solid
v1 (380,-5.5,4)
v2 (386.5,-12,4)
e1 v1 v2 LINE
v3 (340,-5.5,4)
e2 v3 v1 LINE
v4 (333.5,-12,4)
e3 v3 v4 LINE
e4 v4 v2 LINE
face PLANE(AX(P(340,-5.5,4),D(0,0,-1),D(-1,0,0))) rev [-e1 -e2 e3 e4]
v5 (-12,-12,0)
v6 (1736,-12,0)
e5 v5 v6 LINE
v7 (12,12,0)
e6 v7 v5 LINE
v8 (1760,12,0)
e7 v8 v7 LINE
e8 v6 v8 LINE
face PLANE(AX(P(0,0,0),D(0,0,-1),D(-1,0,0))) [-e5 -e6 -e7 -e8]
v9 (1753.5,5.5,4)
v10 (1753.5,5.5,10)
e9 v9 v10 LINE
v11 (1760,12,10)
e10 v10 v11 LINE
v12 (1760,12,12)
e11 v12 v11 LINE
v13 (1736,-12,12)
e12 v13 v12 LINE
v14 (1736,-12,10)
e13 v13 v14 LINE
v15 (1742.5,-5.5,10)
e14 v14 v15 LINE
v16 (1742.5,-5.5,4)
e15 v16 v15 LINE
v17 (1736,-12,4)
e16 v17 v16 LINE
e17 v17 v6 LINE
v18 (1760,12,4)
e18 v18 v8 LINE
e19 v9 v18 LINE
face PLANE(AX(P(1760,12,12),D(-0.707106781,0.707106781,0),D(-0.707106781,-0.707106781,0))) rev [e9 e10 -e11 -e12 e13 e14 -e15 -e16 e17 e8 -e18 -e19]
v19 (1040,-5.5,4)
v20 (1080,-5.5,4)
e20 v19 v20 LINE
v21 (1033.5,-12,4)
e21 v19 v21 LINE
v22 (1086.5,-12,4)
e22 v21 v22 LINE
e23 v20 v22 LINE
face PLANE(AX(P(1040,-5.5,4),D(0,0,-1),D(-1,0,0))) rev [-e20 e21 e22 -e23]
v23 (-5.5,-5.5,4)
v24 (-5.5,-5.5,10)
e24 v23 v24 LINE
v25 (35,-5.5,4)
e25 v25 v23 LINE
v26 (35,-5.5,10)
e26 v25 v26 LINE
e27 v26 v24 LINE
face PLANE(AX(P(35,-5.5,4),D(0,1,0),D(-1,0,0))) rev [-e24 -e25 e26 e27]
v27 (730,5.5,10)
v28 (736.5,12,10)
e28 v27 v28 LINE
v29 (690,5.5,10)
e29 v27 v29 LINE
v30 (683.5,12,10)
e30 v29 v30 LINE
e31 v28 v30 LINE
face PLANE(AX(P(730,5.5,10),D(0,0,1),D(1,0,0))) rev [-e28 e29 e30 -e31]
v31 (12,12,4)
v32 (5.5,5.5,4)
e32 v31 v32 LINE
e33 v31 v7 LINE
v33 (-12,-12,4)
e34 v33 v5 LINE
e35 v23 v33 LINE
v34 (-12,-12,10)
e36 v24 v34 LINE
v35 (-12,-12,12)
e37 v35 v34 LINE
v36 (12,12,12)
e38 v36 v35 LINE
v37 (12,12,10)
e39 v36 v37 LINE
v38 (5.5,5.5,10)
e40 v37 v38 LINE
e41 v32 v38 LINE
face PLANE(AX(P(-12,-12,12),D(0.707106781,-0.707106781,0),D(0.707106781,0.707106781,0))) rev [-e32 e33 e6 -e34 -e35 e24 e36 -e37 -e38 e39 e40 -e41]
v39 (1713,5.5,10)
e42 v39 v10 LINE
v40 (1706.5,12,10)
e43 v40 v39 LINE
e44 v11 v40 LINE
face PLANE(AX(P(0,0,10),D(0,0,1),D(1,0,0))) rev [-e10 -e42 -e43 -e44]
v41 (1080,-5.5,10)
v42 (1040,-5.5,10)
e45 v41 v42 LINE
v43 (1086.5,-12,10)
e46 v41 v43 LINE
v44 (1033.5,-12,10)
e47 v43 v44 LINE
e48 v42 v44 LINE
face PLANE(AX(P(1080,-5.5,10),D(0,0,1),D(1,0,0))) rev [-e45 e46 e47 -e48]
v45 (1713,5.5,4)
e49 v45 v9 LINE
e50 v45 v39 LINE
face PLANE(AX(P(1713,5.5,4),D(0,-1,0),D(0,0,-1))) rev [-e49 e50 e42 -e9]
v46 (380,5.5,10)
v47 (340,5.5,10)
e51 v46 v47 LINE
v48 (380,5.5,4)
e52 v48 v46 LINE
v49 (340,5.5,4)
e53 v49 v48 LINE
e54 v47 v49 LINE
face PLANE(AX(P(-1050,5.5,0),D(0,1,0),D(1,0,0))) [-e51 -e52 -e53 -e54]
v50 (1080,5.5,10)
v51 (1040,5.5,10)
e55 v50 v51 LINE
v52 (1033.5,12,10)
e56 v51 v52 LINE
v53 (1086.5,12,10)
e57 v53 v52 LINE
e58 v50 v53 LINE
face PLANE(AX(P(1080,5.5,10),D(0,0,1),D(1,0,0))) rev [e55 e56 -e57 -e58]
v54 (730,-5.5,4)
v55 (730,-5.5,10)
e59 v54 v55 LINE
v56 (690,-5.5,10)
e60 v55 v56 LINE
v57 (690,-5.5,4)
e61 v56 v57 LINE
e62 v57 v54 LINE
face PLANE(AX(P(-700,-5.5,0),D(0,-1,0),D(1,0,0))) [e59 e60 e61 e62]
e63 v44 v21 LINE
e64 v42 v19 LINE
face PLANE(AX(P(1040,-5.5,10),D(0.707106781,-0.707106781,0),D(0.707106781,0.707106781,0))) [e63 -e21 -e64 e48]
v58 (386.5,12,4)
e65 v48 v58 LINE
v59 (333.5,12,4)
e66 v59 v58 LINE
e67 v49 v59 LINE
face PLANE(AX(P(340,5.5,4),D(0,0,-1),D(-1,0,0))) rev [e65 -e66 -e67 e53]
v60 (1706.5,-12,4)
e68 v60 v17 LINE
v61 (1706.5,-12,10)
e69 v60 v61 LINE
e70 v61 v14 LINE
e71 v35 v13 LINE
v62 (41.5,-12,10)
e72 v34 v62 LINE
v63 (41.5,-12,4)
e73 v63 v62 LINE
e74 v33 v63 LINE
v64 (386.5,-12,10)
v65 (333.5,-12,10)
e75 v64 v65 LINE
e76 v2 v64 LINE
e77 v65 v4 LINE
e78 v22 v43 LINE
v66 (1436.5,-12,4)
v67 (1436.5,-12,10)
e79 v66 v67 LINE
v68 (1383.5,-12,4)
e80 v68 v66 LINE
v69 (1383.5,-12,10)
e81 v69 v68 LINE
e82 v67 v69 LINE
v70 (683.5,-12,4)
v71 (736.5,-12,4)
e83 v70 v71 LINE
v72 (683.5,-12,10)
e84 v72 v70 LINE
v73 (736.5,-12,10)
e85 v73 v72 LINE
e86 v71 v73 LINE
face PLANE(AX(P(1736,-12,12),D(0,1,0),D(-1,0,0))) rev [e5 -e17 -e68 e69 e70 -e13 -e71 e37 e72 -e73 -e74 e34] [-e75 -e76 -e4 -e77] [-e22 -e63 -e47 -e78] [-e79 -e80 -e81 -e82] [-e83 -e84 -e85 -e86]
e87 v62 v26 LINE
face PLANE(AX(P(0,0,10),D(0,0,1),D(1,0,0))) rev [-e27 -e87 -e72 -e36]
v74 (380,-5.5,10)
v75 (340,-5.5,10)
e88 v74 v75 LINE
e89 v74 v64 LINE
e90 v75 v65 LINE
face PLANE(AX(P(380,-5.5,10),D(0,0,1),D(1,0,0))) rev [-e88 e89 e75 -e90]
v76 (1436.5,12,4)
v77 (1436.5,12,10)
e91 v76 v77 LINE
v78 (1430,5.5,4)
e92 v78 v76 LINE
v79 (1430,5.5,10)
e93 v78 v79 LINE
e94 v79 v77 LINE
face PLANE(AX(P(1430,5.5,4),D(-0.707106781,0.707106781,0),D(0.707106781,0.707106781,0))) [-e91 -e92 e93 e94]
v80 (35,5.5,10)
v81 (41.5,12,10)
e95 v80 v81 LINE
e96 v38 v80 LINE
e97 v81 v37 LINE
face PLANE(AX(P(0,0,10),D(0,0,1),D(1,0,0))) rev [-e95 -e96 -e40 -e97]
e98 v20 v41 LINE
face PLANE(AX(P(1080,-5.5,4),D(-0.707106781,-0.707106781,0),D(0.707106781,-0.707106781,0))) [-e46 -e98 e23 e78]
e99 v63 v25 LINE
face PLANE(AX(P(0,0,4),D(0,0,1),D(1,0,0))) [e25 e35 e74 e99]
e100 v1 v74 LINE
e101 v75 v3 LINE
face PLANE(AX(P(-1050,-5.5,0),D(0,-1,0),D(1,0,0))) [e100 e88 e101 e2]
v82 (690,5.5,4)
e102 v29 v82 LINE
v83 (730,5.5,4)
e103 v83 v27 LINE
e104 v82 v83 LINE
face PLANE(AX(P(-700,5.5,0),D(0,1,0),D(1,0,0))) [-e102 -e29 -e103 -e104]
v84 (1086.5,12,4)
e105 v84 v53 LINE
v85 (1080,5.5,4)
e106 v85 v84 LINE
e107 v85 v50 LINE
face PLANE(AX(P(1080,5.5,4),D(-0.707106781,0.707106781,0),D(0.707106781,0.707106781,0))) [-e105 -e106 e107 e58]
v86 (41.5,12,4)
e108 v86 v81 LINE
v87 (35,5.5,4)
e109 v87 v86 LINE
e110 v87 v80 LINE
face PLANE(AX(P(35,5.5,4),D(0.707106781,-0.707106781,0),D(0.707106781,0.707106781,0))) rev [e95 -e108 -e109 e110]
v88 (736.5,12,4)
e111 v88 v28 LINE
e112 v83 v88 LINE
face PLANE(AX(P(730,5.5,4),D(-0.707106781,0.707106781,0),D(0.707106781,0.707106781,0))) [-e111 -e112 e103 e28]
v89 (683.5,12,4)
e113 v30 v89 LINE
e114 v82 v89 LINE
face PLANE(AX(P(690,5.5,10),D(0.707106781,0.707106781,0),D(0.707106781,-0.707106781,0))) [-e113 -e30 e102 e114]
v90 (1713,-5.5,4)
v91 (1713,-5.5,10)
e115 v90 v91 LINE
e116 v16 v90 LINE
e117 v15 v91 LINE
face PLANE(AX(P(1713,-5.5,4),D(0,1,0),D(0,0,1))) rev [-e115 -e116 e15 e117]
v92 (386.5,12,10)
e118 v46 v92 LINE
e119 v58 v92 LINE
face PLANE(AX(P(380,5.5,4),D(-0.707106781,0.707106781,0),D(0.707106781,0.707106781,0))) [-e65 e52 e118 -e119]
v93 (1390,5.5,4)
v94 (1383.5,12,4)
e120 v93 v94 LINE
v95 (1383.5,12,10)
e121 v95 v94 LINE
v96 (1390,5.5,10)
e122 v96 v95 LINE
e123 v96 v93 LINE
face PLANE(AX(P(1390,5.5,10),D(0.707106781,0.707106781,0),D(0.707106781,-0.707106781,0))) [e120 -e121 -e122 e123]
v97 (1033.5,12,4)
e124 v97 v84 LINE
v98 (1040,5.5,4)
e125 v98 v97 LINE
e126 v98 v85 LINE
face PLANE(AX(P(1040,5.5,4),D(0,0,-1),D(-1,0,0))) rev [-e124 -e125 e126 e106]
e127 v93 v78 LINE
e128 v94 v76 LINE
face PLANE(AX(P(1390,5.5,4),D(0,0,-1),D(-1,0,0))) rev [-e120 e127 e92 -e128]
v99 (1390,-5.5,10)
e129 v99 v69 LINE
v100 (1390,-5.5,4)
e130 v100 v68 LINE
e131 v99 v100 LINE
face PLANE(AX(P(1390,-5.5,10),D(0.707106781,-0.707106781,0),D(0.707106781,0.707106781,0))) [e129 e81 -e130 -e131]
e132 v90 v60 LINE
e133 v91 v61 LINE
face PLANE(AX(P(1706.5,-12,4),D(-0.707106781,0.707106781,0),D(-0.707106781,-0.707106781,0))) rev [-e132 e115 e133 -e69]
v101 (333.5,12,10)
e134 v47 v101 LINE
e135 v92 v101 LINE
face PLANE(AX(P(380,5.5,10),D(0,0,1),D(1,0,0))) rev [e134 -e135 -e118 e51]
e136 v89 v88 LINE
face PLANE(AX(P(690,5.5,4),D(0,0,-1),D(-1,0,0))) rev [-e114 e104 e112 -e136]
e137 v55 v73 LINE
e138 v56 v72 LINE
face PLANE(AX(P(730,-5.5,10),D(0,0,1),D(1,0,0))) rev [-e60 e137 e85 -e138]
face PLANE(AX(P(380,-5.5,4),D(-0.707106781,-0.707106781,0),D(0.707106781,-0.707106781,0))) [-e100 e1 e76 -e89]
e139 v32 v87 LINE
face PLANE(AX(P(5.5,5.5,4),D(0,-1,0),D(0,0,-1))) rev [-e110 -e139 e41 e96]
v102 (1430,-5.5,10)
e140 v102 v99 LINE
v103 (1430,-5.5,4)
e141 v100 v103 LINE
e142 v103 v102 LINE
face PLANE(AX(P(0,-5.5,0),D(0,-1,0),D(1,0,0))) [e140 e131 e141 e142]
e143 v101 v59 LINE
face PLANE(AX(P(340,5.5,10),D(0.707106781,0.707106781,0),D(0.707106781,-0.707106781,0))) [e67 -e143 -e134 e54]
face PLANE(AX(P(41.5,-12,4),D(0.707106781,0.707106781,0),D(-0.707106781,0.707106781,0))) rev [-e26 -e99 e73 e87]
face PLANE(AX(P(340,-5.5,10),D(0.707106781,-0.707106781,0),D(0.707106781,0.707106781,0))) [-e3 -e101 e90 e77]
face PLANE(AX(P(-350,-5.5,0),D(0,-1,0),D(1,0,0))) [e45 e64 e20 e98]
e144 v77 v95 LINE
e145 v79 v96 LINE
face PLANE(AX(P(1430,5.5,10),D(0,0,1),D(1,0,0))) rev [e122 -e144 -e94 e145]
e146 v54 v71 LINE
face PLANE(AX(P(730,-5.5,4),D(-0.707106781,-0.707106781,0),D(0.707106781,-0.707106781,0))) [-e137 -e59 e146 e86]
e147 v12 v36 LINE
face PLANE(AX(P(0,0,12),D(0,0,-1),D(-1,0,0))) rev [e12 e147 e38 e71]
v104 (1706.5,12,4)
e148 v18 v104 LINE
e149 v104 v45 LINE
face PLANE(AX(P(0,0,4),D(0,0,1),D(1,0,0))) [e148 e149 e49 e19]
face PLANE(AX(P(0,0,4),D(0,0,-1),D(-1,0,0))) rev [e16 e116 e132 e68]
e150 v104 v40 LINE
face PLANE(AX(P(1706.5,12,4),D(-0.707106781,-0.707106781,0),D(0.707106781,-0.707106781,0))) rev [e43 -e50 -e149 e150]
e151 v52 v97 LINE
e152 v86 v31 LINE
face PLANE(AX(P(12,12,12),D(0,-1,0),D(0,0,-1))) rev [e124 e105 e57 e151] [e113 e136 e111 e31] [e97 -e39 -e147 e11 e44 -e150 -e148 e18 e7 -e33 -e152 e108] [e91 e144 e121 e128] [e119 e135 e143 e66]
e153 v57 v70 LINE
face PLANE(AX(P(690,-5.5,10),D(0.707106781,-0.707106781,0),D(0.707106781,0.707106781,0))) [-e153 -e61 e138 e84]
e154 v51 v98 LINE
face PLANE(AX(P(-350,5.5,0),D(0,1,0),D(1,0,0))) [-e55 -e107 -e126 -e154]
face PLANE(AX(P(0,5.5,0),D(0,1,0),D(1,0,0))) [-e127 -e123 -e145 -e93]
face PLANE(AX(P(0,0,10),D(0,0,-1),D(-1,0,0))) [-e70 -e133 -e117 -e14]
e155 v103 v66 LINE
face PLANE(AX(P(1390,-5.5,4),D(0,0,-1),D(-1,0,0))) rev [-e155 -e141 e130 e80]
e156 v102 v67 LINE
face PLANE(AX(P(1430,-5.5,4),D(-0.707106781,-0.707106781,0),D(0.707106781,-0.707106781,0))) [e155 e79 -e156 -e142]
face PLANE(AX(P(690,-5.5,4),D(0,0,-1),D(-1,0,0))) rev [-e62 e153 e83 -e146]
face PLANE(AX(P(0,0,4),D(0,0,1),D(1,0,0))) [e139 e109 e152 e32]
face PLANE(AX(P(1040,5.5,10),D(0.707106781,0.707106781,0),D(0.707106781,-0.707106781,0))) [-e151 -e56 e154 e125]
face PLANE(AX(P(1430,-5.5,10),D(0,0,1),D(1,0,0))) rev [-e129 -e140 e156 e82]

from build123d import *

# Parameters (mm, degrees)
EXTRUDE_1_DEPTH        = 12
SKETCH_2_W             = 40
SKETCH_2_H             = 6
CUT_EXTRUDE_1_DEPTH    = 6.5
DRAFT_1_ANGLE          = 45
MIRROR_START           = 4
MIRROR_1_DEPTH         = 6
PATTERN_START          = 4
PATTERN_LINEAR_2_DEPTH = 6
CUT_EXTRUDE_START      = -2
CUT_EXTRUDE_2_DEPTH    = 6


# Read off the part's stored shape, not the designer's step: 镜向1, 阵列(线性)2
with BuildPart() as part:
    # 草图1 → 凸台-拉伸1 (new body)
    with BuildSketch(Plane.XY):
        Polygon((-12, -12), (12, 12), (1760, 12), (1736, -12), align=None)
    extrude(amount=EXTRUDE_1_DEPTH)

    # 草图2 → 切除-拉伸1 (cut)
    with BuildSketch(Plane.XZ.offset(12)):
        with Locations((1410, 7)):
            Rectangle(SKETCH_2_W, SKETCH_2_H)
    extrude(amount=-CUT_EXTRUDE_1_DEPTH, mode=Mode.SUBTRACT)

    # 拔模1
    draft_1_faces = [part.faces().sort_by_distance(p)[0] for p in [
        (1430, -8.75, 7),
        (1390, -8.75, 7),
    ]]
    draft(draft_1_faces, Plane(origin=(0, -5.5, 0), x_dir=(-1, 0, 0), z_dir=(0, -1, 0)), DRAFT_1_ANGLE)

    # 镜向1 outline → 镜向1 (cut)
    with BuildSketch(Plane.XY.offset(MIRROR_START)):
        Polygon((1390, 5.5), (1430, 5.5), (1436.5, 12), (1383.5, 12), align=None)
    extrude(amount=MIRROR_1_DEPTH, mode=Mode.SUBTRACT)

    # 阵列(线性)2 outline → 阵列(线性)2 (cut)
    with BuildSketch(Plane.XY.offset(PATTERN_START)):
        Polygon((1086.5, 12), (1033.5, 12), (1040, 5.5), (1080, 5.5), align=None)
        Polygon((736.5, 12), (683.5, 12), (690, 5.5), (730, 5.5), align=None)
        Polygon((333.5, 12), (340, 5.5), (380, 5.5), (386.5, 12), align=None)
        Polygon((1040, -5.5), (1033.5, -12), (1086.5, -12), (1080, -5.5), align=None)
        Polygon((690, -5.5), (683.5, -12), (736.5, -12), (730, -5.5), align=None)
        Polygon((340, -5.5), (333.5, -12), (386.5, -12), (380, -5.5), align=None)
    extrude(amount=PATTERN_LINEAR_2_DEPTH, mode=Mode.SUBTRACT)

    # 草图3 → 切除-拉伸2 (cut)
    with BuildSketch(Plane.XY.offset(12).offset(CUT_EXTRUDE_START)):
        Polygon((1706.5, 12), (1713, 5.5), (1753.5, 5.5), (1760, 12), align=None)
        Polygon((1706.5, -12), (1713, -5.5), (1742.5, -5.5), (1736, -12), align=None)
        Polygon((12, 12), (5.5, 5.5), (35, 5.5), (41.5, 12), align=None)
        Polygon((41.5, -12), (35, -5.5), (-5.5, -5.5), (-12, -12), align=None)
    extrude(amount=-CUT_EXTRUDE_2_DEPTH, mode=Mode.SUBTRACT)


solid = part.part
